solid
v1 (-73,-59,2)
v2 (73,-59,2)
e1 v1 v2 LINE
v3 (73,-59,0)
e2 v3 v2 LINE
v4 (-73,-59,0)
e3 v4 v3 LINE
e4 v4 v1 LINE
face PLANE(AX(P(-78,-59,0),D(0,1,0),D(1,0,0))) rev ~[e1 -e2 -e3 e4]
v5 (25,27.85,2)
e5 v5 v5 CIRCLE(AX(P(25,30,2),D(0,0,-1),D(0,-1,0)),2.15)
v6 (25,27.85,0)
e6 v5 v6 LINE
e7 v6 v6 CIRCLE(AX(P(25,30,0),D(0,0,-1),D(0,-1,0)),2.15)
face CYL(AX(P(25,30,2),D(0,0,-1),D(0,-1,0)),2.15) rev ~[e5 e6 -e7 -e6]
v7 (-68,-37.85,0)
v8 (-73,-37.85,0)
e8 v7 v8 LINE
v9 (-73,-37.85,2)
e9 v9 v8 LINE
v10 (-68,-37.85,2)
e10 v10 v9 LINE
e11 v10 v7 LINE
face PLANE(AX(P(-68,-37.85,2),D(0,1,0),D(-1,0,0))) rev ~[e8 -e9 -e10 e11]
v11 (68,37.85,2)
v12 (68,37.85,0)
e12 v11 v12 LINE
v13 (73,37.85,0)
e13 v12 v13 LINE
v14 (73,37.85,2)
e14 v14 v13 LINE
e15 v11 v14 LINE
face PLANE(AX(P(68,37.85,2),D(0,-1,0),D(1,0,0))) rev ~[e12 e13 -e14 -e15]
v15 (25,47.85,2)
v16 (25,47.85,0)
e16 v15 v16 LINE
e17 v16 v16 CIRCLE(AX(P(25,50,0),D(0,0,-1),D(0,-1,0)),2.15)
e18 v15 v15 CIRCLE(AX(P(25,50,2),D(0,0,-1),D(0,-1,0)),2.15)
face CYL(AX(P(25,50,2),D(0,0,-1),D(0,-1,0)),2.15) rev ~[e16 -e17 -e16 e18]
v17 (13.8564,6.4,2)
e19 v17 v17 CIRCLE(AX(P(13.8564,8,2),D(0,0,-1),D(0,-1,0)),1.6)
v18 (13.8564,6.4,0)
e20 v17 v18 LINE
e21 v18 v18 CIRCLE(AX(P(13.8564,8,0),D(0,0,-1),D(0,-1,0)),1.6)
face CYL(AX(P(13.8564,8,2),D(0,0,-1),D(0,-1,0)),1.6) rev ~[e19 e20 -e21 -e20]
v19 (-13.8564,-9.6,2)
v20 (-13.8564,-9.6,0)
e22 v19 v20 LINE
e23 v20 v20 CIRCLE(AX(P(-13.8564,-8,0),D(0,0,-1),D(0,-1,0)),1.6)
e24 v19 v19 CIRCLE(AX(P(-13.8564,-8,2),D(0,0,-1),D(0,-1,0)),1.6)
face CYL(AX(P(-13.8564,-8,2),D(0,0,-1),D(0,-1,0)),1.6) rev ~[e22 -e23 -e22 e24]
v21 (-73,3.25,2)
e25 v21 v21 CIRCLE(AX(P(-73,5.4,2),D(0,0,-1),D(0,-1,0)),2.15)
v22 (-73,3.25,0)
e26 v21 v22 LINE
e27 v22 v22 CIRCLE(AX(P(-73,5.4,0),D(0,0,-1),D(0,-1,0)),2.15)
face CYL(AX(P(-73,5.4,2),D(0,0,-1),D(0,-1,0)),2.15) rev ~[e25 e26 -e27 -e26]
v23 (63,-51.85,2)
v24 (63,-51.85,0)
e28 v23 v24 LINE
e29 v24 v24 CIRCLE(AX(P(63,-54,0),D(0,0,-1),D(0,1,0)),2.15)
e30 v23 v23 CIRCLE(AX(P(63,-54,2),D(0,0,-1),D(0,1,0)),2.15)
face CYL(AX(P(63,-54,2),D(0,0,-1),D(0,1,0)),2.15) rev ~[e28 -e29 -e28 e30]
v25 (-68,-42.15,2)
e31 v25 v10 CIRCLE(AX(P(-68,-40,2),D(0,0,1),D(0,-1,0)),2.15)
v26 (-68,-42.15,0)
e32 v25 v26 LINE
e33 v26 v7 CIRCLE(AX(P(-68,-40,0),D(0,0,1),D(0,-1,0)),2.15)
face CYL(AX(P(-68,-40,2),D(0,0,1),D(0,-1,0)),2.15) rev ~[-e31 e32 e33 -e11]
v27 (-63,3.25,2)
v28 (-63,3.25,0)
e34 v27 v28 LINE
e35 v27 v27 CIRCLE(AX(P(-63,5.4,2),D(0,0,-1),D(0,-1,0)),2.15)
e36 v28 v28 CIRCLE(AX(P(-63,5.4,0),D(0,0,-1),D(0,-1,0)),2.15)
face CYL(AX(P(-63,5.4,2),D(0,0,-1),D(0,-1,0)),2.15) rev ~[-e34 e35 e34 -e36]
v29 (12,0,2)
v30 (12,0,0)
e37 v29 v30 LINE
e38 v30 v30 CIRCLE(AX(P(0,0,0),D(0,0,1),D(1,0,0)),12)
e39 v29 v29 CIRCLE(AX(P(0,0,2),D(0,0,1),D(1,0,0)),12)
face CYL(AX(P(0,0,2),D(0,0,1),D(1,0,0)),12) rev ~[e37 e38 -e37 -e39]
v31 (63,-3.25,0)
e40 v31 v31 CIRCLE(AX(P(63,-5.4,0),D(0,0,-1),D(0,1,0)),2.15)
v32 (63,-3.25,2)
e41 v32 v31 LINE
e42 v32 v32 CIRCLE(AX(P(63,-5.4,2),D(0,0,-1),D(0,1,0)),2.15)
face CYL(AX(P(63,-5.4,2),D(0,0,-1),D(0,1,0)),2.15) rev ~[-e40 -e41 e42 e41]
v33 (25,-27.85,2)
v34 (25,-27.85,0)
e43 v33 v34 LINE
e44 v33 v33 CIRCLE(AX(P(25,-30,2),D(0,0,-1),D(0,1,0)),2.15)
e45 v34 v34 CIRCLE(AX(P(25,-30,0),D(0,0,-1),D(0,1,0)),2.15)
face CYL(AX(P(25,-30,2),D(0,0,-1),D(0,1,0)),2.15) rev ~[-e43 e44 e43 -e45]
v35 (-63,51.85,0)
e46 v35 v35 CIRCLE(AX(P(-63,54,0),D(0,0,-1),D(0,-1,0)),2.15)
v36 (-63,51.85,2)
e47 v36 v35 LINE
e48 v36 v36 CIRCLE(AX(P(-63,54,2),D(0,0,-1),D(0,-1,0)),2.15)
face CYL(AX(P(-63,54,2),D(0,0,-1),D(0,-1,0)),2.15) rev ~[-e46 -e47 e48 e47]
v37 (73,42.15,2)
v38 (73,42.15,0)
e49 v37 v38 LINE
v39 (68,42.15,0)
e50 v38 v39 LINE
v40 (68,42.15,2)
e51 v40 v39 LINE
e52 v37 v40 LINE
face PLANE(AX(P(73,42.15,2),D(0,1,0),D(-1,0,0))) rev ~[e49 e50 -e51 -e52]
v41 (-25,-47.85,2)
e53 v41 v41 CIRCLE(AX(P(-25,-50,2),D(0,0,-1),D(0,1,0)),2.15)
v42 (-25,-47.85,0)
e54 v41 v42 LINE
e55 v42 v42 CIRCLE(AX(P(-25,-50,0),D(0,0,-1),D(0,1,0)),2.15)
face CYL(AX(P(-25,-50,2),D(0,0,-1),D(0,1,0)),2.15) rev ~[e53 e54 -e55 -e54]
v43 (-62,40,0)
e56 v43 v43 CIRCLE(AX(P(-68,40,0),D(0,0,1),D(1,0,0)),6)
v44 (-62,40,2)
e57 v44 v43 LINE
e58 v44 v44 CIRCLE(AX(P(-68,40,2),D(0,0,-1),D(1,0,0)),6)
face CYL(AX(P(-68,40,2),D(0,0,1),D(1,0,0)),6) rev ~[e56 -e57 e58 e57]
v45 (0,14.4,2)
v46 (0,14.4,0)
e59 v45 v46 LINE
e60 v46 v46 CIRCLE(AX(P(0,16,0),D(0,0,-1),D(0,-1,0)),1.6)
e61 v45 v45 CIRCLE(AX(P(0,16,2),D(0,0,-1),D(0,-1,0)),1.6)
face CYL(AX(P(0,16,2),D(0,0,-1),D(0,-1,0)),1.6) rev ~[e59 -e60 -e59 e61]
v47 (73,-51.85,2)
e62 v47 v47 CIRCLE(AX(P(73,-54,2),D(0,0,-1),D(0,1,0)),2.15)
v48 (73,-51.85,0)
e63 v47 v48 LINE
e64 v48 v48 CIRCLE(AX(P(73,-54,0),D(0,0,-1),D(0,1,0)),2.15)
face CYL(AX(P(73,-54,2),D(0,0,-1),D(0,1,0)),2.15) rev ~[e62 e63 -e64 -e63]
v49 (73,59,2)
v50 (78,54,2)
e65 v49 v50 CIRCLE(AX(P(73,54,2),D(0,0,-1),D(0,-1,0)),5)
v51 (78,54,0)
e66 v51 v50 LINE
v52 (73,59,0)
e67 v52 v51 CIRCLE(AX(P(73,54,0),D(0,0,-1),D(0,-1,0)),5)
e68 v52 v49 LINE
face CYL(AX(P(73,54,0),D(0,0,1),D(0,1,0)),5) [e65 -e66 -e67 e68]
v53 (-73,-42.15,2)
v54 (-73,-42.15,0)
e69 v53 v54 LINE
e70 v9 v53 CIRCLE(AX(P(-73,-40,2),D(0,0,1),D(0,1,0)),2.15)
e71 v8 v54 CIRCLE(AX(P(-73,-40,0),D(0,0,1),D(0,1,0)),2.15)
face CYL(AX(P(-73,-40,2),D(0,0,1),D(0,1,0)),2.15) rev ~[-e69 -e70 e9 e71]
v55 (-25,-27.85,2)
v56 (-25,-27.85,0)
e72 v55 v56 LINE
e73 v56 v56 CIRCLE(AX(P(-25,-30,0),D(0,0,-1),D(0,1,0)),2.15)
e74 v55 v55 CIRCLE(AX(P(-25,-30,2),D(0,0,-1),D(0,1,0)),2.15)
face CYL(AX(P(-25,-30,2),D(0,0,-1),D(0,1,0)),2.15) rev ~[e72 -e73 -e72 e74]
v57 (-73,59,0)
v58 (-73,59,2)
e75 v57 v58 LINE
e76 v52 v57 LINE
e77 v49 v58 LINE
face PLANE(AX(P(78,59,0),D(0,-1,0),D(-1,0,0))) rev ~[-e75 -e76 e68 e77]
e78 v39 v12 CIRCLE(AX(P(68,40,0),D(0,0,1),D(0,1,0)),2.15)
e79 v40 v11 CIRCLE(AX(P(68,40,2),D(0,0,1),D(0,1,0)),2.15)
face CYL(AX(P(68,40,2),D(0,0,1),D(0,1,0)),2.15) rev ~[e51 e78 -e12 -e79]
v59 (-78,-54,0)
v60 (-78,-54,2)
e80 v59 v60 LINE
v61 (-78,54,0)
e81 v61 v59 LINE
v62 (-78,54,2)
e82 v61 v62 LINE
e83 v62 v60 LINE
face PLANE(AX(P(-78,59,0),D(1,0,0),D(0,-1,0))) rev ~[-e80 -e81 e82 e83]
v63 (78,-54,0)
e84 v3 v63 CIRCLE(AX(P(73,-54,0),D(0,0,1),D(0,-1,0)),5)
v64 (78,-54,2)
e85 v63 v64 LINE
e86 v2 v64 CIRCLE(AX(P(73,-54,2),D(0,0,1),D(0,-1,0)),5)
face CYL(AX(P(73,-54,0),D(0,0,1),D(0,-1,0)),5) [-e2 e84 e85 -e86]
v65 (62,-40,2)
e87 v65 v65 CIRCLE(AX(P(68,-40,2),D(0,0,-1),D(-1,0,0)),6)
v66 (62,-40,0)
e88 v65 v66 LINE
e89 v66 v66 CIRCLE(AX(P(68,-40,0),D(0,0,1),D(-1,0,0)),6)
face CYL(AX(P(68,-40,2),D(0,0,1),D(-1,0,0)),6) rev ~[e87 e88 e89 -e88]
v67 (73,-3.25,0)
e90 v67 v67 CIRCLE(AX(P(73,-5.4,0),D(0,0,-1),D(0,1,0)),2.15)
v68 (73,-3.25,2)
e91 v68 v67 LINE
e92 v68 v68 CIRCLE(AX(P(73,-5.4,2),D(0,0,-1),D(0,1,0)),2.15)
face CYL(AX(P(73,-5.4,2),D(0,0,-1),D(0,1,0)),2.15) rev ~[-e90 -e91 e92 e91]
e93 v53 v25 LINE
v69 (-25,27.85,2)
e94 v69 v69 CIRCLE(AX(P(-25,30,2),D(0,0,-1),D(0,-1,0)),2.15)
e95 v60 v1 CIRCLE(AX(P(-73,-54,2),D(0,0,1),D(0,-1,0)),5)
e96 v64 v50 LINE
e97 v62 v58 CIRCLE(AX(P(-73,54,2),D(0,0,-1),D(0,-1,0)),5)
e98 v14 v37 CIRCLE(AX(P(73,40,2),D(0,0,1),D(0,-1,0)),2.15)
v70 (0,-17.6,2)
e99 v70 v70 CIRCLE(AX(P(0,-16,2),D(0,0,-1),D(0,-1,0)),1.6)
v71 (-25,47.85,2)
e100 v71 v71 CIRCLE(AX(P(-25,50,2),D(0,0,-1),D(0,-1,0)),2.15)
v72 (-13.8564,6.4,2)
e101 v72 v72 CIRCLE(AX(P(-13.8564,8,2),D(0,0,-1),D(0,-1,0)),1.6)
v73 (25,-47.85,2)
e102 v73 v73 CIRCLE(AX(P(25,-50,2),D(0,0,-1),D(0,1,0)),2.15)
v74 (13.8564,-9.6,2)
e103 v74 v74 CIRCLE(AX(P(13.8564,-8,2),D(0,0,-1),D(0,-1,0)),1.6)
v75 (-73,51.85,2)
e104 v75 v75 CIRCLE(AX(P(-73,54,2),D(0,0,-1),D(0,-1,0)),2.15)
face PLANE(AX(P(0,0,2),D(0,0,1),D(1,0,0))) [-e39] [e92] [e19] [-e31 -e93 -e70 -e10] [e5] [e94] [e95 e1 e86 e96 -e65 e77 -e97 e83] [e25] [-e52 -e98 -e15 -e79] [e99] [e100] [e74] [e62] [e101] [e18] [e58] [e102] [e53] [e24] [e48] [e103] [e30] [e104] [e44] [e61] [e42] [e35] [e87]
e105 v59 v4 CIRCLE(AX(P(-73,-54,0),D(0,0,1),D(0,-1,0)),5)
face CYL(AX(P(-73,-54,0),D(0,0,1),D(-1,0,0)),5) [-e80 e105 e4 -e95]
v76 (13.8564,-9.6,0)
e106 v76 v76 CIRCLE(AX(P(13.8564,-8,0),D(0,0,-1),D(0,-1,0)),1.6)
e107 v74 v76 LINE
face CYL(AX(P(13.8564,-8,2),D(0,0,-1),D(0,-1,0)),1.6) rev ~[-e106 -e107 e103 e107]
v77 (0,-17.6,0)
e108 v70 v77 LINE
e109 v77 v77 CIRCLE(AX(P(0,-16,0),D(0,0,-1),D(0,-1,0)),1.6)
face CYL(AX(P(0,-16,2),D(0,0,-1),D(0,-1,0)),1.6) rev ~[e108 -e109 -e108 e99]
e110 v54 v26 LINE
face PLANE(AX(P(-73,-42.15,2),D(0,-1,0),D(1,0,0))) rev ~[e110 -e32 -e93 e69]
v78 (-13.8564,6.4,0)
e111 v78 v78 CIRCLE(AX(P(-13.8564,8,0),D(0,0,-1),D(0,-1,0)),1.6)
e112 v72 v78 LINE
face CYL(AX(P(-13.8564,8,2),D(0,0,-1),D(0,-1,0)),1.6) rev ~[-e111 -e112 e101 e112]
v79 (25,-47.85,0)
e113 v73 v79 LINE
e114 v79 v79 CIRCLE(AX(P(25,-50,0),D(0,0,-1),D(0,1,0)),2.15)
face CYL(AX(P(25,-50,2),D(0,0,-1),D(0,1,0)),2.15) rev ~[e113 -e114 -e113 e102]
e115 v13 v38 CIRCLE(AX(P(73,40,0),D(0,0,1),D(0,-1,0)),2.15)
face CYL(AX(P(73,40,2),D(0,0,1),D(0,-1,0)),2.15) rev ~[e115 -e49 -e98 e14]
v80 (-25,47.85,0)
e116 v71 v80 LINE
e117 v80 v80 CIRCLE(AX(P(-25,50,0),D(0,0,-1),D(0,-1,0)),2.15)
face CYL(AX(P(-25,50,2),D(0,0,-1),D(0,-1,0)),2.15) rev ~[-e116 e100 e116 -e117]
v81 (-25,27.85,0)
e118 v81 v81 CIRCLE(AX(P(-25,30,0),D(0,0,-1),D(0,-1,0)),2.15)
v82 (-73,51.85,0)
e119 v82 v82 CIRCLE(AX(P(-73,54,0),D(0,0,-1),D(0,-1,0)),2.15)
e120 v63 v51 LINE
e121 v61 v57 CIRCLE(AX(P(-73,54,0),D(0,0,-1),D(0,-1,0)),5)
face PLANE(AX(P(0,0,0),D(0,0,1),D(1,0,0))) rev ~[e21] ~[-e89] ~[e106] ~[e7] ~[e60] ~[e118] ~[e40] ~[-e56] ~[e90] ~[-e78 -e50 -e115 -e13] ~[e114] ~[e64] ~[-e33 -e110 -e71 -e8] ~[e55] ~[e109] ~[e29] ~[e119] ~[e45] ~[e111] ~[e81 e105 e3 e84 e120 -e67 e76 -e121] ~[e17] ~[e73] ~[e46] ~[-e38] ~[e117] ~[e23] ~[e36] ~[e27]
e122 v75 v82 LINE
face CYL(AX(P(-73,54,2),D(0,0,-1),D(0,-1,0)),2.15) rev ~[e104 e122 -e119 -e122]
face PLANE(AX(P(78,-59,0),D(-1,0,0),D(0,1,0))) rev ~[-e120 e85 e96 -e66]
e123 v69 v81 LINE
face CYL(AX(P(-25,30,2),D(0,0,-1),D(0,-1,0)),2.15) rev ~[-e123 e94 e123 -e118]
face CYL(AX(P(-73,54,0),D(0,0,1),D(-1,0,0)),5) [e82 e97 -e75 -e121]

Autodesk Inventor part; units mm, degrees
ref_plane "YZ Plane" through (0, 0, 0) normal (1, 0, 0) x (0, 1, 0)
ref_plane "XZ Plane" through (0, 0, 0) normal (0, 1, 0) x (-1, 0, 0)
ref_plane "XY Plane" through (0, 0, 0) normal (0, 0, 1) x (1, 0, 0)
sketch "スケッチ1" plane through (0, 0, 0) normal (0, 0, 1) x (1, 0, 0)
  line L0 (-78, -59) -> (78, -59)
  line L1 (78, -59) -> (78, 59)
  line L2 (78, 59) -> (-78, 59)
  line L3 (-78, 59) -> (-78, -59)
  line L4 (-78, -59) -> (78, 59) construction
  line L5 (78, -59) -> (-78, 59) construction
  point P0 (0, 0)
  dimension "d0" = 156
  dimension "d1" = 118
extrude "プレート1" add sketch "スケッチ1" along normal blind 2
sketch "スケッチ2" plane through (0, 0, 2) normal (0, 0, 1) x (1, 0, 0)
  line L0 (-25, 30) -> (25, 30)
  line L1 (25, 30) -> (25, 50)
  line L2 (25, 50) -> (-25, 50)
  line L3 (-25, 50) -> (-25, 30)
  line L4 (-25, 30) -> (25, 50) construction
  line L5 (25, 30) -> (-25, 50) construction
  line L6 (-78, 59) -> (78, 59) projected
  point P0 (0, 0)
  point P1 (0, 40)
  point P2 (0, 40)
  point P3 (0, 40)
  dimension "d3" = 50
  dimension "d4" = 20
  dimension "d60" = 40
hole "穴1" at (-25, 50, 2) at (-25, 30, 2) at (25, 30, 2) at (25, 50, 2) direction (0, 0, -1) diameter 4.3 depth 2 clearance for "Flat Head Machine Screw" size "M4" standard "Ansi Metric M Profile"
sketch "スケッチ3" plane through (0, 0, 2) normal (0, 0, 1) x (1, 0, 0)
  line L0 (-63, 5.4) -> (-73, 5.4)
  line L1 (-73, 5.4) -> (-73, 54)
  line L2 (-73, 54) -> (-63, 54)
  line L3 (-63, 54) -> (-63, 5.4)
  line L4 (-63, 5.4) -> (-73, 54) construction
  line L5 (-73, 5.4) -> (-63, 54) construction
  line L6 (-78, 59) -> (78, 59) projected
  line L7 (-78, -59) -> (-78, 59) projected
  circle A0 centre (-68, 40) radius 6
  point P0 (0, 0)
  point P1 (-68, 29.7)
  point P2 (-68, 29.7)
  dimension "d18" = 10
  dimension "d19" = 48.6
  dimension "d20" = 14
  dimension "d31" = 19
  dimension "d47" = 68
  dimension "d48" = 12
extrude "押し出し2" cut sketch "スケッチ3" against normal blind 10 contours A0 L1 L3 | L3 A0 | A0 L1
hole "穴2" at (-63, 5.4, 2) at (-73, 5.4, 2) at (-73, 54, 2) at (-63, 54, 2) direction (0, 0, -1) diameter 4.3 depth 2 clearance for "Flat Head Machine Screw" size "M4" standard "Ansi Metric M Profile"
sketch "スケッチ4" plane through (0, 0, 2) normal (0, 0, 1) x (1, 0, 0)
  circle A0 centre (0, 0) radius 16
  point P0 (0, 16)
  point P1 (-13.8564, 8)
  point P2 (-13.8564, -8)
  point P3 (0, -16)
  point P4 (13.8564, -8)
  point P5 (13.8564, 8)
  dimension "d32" = 32
  dimension "d35" = 360
hole "穴3" at (0, 16, 2) at (-13.8564, 8, 2) at (-13.8564, -8, 2) at (0, -16, 2) at (13.8564, -8, 2) at (13.8564, 8, 2) direction (0, 0, -1) diameter 3.2 end through all clearance for "Socket Head Cap Screw" size "M3" standard "Ansi Metric M Profile"
sketch "スケッチ5" plane through (0, 0, 2) normal (0, 0, 1) x (1, 0, 0)
  circle A0 centre (0, 0) radius 12
  dimension "d44" = 24
extrude "押し出し1" cut sketch "スケッチ5" against normal blind 10
sketch "スケッチ6" plane through (0, 0, 2) normal (0, 0, 1) x (1, 0, 0)
  point P0 (0, 0)
sketch "スケッチ7" plane through (0, 0, 2) normal (0, 0, 1) x (1, 0, 0)
  line L0 (68, 40) -> (73, 40) construction
  line L1 (68, 37.85) -> (73, 37.85)
  line L2 (73, 42.15) -> (68, 42.15)
  arc A0 (68, 42.15) -> (68, 37.85) centre (68, 40) ccw
  arc A1 (73, 37.85) -> (73, 42.15) centre (73, 40) ccw
  circle A2 centre (-68, 40) radius 6 projected
  point P0 (0, 0)
  point P1 (70.5, 40)
  dimension "d54" = 2.15
  dimension "d55" = 5
  dimension "d57" = 68
extrude "押し出し3" cut sketch "スケッチ7" against normal blind 10 contours A0 L2 A1 L1
sketch "スケッチ8" plane through (0, 0, 0) normal (0, 0, -1) x (-1, 0, 0)
  point P0 (0, 0)
fillet "コーナーR1" radius 5 4 edges at (-78, 59, 1) (78, 59, 1) (78, -59, 1) (-78, -59, 1)
pattern_circular "円形状パターン1" count 2 over 360 about axis through (0, 0, -10) along (0, 0, 1) of "穴1", "押し出し2", "穴2", "押し出し3"
equation "\"d14\" = Thickness"
equation "\"d28\" = Thickness"
equation "\"d42\" = Thickness"
equation "\"d2\" = Thickness"
equation "\"BendRadius\" = Thickness"
equation "\"BendReliefWidth\" = Thickness"
equation "\"BendReliefDepth\" = 0.5 * Thickness"
equation "\"CornerReliefSize\" = 4 * Thickness"
equation "\"MinimumRemnant\" = 2 * Thickness"
equation "\"TransitionRadius\" = BendRadius"
equation "\"JacobiRadiusSize\" = BendRadius"
equation "\"GapSize\" = Thickness"
equation "\"Thickness\" = 2"
properties part number "carbon_plate14" material "CFRP"
